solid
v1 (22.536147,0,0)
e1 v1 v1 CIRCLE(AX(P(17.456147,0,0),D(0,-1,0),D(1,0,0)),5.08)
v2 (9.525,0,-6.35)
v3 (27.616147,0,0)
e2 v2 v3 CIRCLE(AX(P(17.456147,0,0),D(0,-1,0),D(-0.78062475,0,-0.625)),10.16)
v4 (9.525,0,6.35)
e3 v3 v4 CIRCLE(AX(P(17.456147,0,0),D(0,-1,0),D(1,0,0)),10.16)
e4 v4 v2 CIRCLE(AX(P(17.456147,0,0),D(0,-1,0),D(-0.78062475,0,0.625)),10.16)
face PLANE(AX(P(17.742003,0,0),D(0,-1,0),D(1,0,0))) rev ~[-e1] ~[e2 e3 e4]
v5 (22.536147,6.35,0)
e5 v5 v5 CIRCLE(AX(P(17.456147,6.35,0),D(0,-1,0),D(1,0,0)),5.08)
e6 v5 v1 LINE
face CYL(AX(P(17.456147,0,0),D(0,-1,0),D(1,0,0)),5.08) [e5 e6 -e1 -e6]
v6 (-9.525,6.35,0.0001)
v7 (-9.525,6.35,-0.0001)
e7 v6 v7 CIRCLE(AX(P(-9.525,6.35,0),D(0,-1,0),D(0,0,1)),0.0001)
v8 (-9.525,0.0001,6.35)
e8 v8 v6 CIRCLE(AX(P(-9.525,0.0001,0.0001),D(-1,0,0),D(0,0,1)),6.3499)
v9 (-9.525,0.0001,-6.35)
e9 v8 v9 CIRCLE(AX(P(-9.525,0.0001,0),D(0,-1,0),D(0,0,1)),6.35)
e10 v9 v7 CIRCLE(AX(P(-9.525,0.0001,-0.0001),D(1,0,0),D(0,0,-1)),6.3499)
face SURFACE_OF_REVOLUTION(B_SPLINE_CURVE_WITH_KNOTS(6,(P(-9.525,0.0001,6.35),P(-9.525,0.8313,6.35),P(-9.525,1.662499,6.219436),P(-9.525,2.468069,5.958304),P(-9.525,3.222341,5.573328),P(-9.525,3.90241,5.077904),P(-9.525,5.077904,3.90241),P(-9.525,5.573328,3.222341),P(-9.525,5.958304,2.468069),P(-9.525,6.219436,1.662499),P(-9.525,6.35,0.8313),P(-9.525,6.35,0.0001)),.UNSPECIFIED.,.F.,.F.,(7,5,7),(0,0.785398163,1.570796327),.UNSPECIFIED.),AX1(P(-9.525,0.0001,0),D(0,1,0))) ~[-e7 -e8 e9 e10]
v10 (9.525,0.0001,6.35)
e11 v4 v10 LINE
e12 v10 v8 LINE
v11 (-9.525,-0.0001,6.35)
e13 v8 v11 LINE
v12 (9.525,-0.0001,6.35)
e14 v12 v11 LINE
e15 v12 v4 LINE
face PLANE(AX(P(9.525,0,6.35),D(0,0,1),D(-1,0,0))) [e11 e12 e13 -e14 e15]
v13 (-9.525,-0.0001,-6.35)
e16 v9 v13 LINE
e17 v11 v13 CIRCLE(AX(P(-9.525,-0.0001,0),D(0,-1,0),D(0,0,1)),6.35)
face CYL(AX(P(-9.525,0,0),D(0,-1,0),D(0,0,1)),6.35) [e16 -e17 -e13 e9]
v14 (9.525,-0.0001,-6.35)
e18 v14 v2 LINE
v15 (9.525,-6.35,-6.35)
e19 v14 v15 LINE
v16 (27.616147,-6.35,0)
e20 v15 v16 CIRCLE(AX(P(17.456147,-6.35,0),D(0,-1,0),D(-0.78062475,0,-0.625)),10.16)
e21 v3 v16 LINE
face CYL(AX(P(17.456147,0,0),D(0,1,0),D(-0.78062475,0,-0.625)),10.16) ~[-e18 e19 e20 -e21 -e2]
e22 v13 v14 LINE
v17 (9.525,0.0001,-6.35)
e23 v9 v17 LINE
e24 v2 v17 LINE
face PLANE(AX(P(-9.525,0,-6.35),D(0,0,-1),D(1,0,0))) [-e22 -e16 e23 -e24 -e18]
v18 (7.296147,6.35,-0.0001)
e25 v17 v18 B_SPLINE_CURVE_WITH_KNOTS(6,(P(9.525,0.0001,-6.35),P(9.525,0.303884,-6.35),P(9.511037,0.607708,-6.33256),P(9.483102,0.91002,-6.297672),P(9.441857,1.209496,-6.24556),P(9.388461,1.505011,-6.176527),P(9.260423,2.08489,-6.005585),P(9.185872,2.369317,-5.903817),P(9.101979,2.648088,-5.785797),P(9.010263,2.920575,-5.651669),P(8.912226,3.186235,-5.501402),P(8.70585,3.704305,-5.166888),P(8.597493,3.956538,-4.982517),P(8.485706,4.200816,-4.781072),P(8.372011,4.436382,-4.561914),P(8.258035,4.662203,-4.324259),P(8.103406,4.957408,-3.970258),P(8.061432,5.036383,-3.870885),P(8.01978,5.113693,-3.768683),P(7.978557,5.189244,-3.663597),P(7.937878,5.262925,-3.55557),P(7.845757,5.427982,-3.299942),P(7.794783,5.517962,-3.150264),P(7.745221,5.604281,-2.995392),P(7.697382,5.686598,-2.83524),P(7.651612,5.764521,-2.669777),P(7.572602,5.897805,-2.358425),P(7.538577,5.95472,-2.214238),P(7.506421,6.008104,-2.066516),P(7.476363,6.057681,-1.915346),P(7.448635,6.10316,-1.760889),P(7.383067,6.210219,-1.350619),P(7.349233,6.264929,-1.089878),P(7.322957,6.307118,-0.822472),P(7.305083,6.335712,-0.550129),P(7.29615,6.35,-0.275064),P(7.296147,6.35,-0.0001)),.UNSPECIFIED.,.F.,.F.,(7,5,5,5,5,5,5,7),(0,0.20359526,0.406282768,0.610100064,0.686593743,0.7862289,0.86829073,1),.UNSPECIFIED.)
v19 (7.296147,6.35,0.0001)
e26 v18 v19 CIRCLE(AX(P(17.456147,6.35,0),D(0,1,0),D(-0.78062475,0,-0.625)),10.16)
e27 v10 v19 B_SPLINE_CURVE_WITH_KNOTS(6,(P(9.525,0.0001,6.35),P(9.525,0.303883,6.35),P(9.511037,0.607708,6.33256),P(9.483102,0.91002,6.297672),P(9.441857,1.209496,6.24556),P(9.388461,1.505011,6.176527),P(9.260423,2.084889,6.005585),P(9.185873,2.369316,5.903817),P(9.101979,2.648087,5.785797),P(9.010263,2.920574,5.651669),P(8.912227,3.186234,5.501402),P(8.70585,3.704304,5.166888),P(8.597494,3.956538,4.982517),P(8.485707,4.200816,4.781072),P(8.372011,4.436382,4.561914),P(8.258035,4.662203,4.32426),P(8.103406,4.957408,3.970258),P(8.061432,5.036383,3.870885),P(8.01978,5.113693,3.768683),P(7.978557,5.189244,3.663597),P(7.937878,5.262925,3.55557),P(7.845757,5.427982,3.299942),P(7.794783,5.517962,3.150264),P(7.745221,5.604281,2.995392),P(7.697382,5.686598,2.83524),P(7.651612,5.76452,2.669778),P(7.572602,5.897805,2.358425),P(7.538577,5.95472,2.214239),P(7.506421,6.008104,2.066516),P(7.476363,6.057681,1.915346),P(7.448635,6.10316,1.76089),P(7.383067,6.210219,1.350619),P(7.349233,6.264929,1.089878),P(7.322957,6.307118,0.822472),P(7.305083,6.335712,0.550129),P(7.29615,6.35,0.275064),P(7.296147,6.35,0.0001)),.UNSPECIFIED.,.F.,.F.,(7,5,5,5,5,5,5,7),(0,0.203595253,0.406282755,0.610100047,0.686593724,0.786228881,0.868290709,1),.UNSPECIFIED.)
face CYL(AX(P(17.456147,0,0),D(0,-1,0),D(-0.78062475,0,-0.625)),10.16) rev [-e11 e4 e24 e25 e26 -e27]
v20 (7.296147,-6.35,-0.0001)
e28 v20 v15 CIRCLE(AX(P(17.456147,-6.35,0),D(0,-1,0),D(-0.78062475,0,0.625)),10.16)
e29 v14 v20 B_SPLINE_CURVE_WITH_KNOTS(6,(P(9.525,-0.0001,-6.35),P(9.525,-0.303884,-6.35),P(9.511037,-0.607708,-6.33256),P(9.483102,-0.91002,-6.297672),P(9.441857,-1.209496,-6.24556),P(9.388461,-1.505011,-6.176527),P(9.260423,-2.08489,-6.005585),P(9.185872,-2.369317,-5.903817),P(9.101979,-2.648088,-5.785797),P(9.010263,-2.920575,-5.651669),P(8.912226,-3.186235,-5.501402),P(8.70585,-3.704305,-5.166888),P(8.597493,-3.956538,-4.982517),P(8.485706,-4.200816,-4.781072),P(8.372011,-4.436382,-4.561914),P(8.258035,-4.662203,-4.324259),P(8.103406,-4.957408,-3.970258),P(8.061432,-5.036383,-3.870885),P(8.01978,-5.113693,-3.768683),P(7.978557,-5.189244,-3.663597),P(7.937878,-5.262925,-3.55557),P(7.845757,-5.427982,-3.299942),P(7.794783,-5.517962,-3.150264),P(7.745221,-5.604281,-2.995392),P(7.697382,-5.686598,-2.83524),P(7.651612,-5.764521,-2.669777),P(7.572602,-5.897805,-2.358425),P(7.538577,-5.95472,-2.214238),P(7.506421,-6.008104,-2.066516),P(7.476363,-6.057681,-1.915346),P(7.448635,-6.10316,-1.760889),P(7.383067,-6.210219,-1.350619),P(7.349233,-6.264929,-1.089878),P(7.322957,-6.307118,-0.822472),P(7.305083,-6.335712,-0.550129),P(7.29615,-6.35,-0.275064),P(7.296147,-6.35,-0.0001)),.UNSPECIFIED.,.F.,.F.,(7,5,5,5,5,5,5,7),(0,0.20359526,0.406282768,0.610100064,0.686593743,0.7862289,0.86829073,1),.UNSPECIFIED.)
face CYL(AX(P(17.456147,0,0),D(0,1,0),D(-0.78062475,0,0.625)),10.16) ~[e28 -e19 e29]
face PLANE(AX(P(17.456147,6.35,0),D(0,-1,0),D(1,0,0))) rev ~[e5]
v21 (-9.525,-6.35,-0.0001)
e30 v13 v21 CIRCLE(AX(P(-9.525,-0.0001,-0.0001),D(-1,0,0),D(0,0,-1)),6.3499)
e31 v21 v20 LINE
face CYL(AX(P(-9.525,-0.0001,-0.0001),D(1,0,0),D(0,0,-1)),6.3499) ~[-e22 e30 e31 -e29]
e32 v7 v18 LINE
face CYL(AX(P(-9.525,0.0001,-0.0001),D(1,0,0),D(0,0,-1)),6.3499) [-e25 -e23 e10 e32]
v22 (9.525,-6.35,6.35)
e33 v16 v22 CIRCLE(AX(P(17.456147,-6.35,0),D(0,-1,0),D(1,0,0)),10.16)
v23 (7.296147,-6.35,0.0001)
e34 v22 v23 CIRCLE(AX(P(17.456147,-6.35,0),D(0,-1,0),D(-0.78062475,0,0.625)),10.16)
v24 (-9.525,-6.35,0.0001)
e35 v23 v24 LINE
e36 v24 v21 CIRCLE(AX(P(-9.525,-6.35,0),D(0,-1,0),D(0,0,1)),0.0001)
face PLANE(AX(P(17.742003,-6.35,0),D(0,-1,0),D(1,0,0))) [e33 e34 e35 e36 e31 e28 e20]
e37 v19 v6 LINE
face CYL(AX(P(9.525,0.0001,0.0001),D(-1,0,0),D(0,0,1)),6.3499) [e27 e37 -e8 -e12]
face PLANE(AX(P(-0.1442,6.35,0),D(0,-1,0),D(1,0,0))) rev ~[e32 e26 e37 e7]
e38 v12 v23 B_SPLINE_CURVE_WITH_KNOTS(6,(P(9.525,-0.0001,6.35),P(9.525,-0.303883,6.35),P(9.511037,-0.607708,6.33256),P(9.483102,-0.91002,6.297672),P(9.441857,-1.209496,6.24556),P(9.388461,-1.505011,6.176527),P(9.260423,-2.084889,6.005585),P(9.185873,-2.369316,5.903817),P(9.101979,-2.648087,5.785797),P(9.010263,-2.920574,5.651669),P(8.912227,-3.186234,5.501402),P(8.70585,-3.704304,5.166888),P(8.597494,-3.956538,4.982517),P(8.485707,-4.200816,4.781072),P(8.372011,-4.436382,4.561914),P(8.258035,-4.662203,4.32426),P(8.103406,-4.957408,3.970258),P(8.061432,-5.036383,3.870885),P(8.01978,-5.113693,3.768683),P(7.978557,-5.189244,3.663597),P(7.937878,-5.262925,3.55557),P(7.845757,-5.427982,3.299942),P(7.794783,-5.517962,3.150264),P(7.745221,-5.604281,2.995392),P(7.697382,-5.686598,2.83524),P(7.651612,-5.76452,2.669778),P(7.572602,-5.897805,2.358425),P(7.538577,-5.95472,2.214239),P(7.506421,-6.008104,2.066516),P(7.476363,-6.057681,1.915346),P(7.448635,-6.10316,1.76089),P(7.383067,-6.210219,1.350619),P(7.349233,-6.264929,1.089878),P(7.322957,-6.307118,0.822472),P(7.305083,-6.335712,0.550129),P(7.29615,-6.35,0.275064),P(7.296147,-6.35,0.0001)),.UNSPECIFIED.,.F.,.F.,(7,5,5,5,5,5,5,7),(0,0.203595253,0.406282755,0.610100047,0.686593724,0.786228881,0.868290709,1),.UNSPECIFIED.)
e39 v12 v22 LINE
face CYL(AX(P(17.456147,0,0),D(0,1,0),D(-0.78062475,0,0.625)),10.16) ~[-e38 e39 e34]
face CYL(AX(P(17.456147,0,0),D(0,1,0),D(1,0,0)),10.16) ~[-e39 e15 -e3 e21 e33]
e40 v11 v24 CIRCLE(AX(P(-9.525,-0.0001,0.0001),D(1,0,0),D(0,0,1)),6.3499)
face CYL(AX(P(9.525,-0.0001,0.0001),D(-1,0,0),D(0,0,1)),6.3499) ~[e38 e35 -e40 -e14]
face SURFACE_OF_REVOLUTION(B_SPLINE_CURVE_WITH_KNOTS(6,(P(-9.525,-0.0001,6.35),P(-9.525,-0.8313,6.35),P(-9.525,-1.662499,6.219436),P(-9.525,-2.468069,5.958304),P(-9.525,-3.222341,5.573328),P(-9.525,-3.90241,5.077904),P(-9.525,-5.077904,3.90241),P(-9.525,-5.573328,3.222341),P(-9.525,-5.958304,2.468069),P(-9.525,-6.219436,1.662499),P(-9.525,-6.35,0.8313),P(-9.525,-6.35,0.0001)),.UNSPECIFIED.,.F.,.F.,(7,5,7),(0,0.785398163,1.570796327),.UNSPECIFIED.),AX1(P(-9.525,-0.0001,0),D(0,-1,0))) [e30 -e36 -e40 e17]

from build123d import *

# Parameters (mm, degrees)
F1_DEPTH = 6.35
F2_R     = 6.3499
F0_R     = 5.08
F3_DEPTH = 6.35
F4_DEPTH = 6.35


# Not quite as in the source:
# - a fillet or chamfer is up to 0.001 mm smaller than in the source, because OpenCascade refuses the exact size


with BuildPart() as f1:
    # F0 (on Front) → F1 (new body, symmetric)
    with BuildSketch(Plane.XZ):
        with BuildLine():
            Line((9.525, 6.35), (-9.525, 6.35))
            Line((-9.525, 6.35), (-9.525, -6.35))
            Line((-9.525, -6.35), (9.525, -6.35))
            ThreePointArc((9.525, -6.35), (7.296147458, 0), (9.525, 6.35))
        make_face()
        with BuildLine():
            Line((-9.525, -6.35), (-9.525, 6.35))
            ThreePointArc((-9.525, 6.35), (-15.875, 0), (-9.525, -6.35))
        make_face()
    extrude(amount=F1_DEPTH, both=True)

    # F2 (radius 6.35 in the source; OpenCascade refuses exactly that, so slightly less here)
    f2_edges = [f1.edges().sort_by_distance(p)[0] for p in [
        (0, -6.35, 6.35),
        (0, 6.35, 6.35),
        (0, -6.35, -6.35),
        (0, 6.35, -6.35),
    ]]
    fillet(f2_edges, radius=F2_R)

    # F0 (on Front) → F3 (join)
    with BuildSketch(Plane.XZ):
        with BuildLine():
            ThreePointArc((27.616147458, 0), (20.8210502669, 9.5866067556), (9.525, 6.35))
            Line((9.525, 6.35), (9.525, -6.35))
            ThreePointArc((9.525, -6.35), (20.8210502669, -9.5866067556), (27.616147458, 0))
        make_face()
        with Locations((17.456147458, 0)):
            Circle(F0_R, mode=Mode.SUBTRACT)
        with BuildLine():
            Line((9.525, -6.35), (9.525, 6.35))
            ThreePointArc((9.525, 6.35), (7.296147458, 0), (9.525, -6.35))
        make_face()
    extrude(amount=F3_DEPTH)

    # F0 (on Front) → F4 (join, symmetric)
    with BuildSketch(Plane.XZ):
        with Locations((17.456147458, 0)):
            Circle(F0_R)
    extrude(amount=F4_DEPTH, both=True)


solid = f1.part
